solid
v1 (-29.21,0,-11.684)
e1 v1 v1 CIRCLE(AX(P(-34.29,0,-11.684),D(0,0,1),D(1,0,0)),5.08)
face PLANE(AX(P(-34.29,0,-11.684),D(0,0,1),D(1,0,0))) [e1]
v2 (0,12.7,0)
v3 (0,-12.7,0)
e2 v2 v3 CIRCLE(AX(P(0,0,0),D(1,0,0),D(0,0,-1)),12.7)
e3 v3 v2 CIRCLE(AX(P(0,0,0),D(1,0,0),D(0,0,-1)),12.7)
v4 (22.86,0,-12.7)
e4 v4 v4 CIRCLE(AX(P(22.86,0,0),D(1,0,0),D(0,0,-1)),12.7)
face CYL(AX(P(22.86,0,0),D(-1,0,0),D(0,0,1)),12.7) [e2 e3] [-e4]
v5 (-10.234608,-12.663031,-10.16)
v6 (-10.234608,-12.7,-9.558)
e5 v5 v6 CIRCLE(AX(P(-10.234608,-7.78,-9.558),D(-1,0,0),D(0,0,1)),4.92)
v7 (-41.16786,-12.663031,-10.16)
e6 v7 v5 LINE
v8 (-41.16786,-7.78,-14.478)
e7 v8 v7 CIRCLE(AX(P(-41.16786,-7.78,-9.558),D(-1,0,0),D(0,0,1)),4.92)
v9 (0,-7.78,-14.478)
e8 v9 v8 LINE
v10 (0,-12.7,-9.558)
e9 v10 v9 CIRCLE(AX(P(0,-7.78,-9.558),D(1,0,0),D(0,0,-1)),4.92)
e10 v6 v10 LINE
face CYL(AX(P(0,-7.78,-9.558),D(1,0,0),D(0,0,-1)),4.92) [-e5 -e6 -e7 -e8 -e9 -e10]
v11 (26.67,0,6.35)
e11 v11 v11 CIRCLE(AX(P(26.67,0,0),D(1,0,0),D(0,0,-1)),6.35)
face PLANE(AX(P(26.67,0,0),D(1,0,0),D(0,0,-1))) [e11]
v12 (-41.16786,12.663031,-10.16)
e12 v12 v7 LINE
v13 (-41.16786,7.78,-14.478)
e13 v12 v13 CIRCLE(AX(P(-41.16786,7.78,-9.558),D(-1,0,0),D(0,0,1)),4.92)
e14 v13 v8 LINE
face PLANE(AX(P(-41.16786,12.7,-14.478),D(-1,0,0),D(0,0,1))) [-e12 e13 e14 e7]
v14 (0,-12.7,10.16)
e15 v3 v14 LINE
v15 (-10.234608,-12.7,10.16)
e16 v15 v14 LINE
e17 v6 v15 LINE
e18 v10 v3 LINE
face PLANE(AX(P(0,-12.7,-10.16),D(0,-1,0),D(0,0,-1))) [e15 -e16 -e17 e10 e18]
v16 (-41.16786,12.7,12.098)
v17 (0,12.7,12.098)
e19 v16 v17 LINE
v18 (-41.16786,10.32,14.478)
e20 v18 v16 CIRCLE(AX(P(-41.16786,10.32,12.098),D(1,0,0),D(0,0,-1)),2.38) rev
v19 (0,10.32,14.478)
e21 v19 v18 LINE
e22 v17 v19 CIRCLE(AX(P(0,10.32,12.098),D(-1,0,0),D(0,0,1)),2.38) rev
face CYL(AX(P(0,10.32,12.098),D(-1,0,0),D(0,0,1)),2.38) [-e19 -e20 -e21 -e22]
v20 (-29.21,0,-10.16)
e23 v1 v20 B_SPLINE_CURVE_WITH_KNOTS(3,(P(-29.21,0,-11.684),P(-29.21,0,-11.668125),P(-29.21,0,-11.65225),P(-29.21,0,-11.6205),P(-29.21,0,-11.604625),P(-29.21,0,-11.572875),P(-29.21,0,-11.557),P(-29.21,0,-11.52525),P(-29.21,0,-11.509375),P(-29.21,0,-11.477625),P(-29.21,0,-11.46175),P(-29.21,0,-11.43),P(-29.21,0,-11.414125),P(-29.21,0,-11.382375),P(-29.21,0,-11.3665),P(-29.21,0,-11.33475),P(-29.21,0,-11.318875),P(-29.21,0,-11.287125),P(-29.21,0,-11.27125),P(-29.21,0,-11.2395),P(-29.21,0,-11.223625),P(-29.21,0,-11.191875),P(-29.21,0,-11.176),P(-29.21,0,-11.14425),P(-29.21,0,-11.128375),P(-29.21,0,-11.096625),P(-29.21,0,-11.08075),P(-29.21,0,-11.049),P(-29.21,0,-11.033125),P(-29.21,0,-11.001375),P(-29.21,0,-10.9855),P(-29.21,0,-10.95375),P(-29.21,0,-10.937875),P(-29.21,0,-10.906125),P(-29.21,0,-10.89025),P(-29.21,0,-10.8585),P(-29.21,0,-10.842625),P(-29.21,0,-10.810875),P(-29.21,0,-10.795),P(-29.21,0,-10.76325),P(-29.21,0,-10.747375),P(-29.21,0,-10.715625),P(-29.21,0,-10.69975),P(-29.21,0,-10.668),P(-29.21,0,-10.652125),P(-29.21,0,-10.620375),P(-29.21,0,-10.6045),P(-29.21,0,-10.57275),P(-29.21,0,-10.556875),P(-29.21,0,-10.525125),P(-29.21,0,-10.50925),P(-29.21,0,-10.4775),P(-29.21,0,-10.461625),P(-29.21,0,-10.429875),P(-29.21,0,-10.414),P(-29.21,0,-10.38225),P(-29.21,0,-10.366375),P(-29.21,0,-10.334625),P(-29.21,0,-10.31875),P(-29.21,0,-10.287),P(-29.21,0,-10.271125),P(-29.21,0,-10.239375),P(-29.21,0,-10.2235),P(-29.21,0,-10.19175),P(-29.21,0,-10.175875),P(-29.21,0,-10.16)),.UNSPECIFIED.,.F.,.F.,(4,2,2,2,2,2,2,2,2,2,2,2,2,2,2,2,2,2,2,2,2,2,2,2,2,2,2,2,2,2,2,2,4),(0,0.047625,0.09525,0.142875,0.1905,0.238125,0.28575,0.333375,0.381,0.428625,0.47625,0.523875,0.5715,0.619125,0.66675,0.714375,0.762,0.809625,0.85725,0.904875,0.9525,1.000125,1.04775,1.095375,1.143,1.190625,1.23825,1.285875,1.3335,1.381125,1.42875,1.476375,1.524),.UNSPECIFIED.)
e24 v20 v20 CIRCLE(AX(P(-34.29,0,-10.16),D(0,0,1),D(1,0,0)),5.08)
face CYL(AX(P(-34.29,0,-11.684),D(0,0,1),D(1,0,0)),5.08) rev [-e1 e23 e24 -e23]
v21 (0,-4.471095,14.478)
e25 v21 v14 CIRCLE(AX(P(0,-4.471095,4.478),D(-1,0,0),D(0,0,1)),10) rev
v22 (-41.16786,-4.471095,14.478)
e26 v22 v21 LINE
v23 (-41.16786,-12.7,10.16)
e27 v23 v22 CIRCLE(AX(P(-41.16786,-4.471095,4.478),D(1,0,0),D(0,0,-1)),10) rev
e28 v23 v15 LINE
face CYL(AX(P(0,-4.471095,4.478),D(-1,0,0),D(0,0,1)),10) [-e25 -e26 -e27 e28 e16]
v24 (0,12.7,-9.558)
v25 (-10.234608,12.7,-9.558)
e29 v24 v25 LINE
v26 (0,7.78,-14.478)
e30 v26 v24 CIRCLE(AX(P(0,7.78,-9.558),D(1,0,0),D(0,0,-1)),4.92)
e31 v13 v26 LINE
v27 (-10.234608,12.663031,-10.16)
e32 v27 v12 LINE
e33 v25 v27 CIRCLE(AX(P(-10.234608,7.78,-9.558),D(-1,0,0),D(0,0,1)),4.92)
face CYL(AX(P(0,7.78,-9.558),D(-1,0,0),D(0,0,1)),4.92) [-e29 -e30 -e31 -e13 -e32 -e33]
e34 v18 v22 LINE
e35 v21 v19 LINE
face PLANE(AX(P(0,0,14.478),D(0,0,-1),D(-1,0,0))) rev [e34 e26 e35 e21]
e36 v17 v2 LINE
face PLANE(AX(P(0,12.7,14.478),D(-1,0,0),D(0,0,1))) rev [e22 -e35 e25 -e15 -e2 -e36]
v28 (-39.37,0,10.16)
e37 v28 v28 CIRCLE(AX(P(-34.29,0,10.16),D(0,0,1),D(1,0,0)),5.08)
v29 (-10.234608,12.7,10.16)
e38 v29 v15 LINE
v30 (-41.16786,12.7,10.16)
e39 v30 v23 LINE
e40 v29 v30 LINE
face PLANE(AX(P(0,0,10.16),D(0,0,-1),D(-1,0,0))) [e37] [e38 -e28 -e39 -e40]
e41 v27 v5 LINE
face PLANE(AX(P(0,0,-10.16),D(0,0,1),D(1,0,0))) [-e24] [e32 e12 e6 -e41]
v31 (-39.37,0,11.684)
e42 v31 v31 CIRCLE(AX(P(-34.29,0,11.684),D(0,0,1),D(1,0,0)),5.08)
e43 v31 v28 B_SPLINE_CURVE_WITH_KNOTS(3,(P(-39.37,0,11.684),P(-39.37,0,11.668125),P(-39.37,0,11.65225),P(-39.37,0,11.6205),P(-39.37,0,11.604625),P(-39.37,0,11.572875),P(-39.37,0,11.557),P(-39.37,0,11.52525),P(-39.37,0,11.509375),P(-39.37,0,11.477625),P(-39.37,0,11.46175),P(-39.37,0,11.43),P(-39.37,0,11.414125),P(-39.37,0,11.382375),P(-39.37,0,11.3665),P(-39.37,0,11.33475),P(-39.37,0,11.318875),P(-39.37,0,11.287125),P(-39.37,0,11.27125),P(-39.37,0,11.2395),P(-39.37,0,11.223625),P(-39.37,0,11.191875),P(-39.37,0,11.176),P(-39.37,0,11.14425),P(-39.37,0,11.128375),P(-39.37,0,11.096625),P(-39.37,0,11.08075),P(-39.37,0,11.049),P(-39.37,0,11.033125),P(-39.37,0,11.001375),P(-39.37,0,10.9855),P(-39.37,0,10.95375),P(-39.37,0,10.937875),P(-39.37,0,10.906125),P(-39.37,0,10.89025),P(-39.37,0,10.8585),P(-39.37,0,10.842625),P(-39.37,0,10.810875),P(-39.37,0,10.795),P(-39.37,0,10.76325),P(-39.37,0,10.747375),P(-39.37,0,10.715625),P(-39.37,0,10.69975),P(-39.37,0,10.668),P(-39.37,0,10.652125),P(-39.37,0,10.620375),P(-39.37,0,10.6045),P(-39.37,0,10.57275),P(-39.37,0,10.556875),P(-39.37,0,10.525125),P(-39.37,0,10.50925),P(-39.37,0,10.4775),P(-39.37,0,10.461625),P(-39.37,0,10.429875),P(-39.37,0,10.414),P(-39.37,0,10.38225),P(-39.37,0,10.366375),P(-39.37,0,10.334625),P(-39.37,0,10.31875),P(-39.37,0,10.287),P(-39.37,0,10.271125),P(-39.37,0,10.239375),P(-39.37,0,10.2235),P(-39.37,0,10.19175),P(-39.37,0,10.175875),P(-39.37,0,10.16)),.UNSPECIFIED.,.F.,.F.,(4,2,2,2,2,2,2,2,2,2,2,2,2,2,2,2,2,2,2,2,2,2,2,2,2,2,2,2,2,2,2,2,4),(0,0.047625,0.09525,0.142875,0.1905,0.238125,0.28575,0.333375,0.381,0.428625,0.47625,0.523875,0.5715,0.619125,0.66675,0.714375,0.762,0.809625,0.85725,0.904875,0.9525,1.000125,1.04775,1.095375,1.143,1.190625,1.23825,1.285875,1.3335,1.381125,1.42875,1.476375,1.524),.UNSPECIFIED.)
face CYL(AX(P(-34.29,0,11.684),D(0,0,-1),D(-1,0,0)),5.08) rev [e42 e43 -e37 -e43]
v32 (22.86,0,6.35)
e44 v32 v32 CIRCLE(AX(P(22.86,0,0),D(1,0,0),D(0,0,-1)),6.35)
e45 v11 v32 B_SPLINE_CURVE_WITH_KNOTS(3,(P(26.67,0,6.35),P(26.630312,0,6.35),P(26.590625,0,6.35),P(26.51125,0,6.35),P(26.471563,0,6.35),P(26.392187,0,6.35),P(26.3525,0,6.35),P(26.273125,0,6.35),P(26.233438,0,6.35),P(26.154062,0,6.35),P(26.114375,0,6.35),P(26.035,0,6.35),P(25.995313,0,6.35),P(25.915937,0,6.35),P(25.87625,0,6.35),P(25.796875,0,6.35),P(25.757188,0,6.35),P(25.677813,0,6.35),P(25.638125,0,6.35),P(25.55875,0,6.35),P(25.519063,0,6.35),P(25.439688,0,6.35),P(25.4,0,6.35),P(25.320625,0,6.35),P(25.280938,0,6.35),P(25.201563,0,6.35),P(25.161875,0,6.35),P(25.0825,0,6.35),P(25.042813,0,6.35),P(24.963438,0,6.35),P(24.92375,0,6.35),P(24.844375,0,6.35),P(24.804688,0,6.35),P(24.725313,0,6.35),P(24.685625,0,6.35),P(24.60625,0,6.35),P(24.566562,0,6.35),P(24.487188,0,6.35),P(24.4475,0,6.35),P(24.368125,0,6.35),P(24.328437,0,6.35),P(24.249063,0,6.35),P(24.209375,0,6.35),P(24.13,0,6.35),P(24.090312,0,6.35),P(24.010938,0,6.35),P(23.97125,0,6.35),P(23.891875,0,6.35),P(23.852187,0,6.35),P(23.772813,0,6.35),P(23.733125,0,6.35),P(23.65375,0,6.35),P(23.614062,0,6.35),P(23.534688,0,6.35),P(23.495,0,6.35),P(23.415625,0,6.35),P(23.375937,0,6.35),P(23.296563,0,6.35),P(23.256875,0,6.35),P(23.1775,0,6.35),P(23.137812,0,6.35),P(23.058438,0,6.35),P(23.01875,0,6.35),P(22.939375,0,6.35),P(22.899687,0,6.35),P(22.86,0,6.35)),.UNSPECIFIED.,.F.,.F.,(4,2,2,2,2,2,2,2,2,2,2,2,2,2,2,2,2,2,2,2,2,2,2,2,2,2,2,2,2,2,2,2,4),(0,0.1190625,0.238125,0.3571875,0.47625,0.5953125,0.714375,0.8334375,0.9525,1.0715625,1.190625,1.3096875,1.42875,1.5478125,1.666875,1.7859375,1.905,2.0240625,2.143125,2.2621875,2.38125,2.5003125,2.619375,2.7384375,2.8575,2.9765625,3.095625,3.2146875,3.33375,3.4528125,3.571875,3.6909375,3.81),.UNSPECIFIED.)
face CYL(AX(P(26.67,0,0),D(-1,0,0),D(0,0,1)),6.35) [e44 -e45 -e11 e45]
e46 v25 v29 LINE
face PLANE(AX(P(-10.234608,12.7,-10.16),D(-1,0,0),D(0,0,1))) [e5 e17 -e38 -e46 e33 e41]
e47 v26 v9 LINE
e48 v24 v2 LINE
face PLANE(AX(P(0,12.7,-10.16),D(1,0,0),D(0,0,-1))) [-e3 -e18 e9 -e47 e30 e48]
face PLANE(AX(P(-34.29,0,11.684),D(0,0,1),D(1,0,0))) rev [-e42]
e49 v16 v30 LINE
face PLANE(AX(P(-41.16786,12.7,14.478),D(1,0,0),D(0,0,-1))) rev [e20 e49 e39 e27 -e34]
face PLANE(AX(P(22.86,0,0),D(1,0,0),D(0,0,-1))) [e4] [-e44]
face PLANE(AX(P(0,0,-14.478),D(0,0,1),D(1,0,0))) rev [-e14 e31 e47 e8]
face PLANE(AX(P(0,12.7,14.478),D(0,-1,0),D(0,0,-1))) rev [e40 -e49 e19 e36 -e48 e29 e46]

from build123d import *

# Parameters (mm, degrees)
SKETCH1_R            = 12.7
BOSS_EXTRUDE1_DEPTH  = 22.86
SKETCH2_R            = 6.35
BOSS_EXTRUDE2_DEPTH  = 3.81
SKETCH4_W            = 41.167859691
SKETCH4_H            = 25.4
BOSS_EXTRUDE4_DEPTH  = 4.318
FILLET3_R            = 2.380000066
FILLET4_R            = 10
SKETCH5_W            = 10.234607526
SKETCH5_H            = 25.4
BOSS_EXTRUDE5_DEPTH  = 20.32
SKETCH8_W            = 41.167859691
SKETCH8_H            = 25.4
BOSS_EXTRUDE10_DEPTH = 4.318
FILLET12_R           = 4.92
FILLET13_R           = 4.92
SKETCH9_R            = 5.08
CUT_EXTRUDE1_DEPTH   = 1.524
CUT_EXTRUDE3_START   = 1.524
SKETCH10_R           = 5.08
CUT_EXTRUDE3_DEPTH   = 1.524


with BuildPart() as part:
    # Sketch1 → Boss-Extrude1 (new body)
    with BuildSketch(Plane(origin=(0, 0, 0), x_dir=(0, 0, -1), z_dir=(1, 0, 0))):
        Circle(SKETCH1_R)
    extrude(amount=BOSS_EXTRUDE1_DEPTH)

    # Sketch2 → Boss-Extrude2 (add)
    with BuildSketch(Plane(origin=(22.86, 0, 0), x_dir=(0, 0, -1), z_dir=(1, 0, 0))):
        with Locations(Location((0, 0, 0), (0, 0, 180))):
            Circle(SKETCH2_R)
    extrude(amount=BOSS_EXTRUDE2_DEPTH)

    # Sketch4 → Boss-Extrude4 (add)
    with BuildSketch(Plane.XY.offset(10.16)):
        with Locations((-20.583929846, 0)):
            Rectangle(SKETCH4_W, SKETCH4_H)
    extrude(amount=BOSS_EXTRUDE4_DEPTH)

    # Fillet3
    fillet3_edges = [part.edges().sort_by_distance(p)[0] for p in [
        (-20.583929846, 12.7, 14.478),
    ]]
    fillet(fillet3_edges, radius=FILLET3_R)

    # Fillet4
    # the kernel refuses this fillet: 10 mm, written as the material it takes off along each edge
    with BuildSketch(Plane(origin=(-61.740121963, -12.7, 14.478), x_dir=(0, 1, 0), z_dir=(1, 0, 0))) as fillet4_piece_1:
        with BuildLine():
            CenterArc((8.228904909, -10), FILLET4_R, 90, 55.375198577)
            Line((0, -4.318), (-0.164578098, -4.20436))
            ThreePointArc((-0.164578098, -4.20436), (-0.2, -2.159), (-0.2, 0))
            Line((-0.2, 0), (0, 0.2))
            Line((0, 0.2), (8.228904909, 0.2))
            Line((8.228904909, 0.2), (8.228904909, 0))
        make_face()
    extrude(amount=82.312384236, mode=Mode.SUBTRACT)

    # Sketch5 → Boss-Extrude5 (add)
    with BuildSketch(Plane.XY.offset(10.16)):
        with Locations((-5.117303763, 0)):
            Rectangle(SKETCH5_W, SKETCH5_H)
    extrude(amount=-BOSS_EXTRUDE5_DEPTH)

    # Sketch8 → Boss-Extrude10 (add)
    with BuildSketch(Plane.XY.offset(-10.16)):
        with Locations((-20.583929846, 0)):
            Rectangle(SKETCH8_W, SKETCH8_H)
    extrude(amount=-BOSS_EXTRUDE10_DEPTH)

    # Fillet12
    fillet12_edges = [part.edges().sort_by_distance(p)[0] for p in [
        (-20.583929846, 12.7, -14.478),
    ]]
    fillet(fillet12_edges, radius=FILLET12_R)

    # Fillet13
    fillet13_edges = [part.edges().sort_by_distance(p)[0] for p in [
        (-20.583929846, -12.7, -14.478),
    ]]
    fillet(fillet13_edges, radius=FILLET13_R)

    # Sketch9 → Cut-Extrude1 (cut)
    with BuildSketch(Plane.XY.offset(-10.16)):
        with Locations((-34.29, 0)):
            Circle(SKETCH9_R)
    extrude(amount=-CUT_EXTRUDE1_DEPTH, mode=Mode.SUBTRACT)

    # Sketch10 → Cut-Extrude3 (cut)
    with BuildSketch(Plane.XY.offset(10.16).offset(CUT_EXTRUDE3_START)):
        with Locations((-34.29, 0)):
            Circle(SKETCH10_R)
    extrude(amount=-CUT_EXTRUDE3_DEPTH, mode=Mode.SUBTRACT)


solid = part.part
